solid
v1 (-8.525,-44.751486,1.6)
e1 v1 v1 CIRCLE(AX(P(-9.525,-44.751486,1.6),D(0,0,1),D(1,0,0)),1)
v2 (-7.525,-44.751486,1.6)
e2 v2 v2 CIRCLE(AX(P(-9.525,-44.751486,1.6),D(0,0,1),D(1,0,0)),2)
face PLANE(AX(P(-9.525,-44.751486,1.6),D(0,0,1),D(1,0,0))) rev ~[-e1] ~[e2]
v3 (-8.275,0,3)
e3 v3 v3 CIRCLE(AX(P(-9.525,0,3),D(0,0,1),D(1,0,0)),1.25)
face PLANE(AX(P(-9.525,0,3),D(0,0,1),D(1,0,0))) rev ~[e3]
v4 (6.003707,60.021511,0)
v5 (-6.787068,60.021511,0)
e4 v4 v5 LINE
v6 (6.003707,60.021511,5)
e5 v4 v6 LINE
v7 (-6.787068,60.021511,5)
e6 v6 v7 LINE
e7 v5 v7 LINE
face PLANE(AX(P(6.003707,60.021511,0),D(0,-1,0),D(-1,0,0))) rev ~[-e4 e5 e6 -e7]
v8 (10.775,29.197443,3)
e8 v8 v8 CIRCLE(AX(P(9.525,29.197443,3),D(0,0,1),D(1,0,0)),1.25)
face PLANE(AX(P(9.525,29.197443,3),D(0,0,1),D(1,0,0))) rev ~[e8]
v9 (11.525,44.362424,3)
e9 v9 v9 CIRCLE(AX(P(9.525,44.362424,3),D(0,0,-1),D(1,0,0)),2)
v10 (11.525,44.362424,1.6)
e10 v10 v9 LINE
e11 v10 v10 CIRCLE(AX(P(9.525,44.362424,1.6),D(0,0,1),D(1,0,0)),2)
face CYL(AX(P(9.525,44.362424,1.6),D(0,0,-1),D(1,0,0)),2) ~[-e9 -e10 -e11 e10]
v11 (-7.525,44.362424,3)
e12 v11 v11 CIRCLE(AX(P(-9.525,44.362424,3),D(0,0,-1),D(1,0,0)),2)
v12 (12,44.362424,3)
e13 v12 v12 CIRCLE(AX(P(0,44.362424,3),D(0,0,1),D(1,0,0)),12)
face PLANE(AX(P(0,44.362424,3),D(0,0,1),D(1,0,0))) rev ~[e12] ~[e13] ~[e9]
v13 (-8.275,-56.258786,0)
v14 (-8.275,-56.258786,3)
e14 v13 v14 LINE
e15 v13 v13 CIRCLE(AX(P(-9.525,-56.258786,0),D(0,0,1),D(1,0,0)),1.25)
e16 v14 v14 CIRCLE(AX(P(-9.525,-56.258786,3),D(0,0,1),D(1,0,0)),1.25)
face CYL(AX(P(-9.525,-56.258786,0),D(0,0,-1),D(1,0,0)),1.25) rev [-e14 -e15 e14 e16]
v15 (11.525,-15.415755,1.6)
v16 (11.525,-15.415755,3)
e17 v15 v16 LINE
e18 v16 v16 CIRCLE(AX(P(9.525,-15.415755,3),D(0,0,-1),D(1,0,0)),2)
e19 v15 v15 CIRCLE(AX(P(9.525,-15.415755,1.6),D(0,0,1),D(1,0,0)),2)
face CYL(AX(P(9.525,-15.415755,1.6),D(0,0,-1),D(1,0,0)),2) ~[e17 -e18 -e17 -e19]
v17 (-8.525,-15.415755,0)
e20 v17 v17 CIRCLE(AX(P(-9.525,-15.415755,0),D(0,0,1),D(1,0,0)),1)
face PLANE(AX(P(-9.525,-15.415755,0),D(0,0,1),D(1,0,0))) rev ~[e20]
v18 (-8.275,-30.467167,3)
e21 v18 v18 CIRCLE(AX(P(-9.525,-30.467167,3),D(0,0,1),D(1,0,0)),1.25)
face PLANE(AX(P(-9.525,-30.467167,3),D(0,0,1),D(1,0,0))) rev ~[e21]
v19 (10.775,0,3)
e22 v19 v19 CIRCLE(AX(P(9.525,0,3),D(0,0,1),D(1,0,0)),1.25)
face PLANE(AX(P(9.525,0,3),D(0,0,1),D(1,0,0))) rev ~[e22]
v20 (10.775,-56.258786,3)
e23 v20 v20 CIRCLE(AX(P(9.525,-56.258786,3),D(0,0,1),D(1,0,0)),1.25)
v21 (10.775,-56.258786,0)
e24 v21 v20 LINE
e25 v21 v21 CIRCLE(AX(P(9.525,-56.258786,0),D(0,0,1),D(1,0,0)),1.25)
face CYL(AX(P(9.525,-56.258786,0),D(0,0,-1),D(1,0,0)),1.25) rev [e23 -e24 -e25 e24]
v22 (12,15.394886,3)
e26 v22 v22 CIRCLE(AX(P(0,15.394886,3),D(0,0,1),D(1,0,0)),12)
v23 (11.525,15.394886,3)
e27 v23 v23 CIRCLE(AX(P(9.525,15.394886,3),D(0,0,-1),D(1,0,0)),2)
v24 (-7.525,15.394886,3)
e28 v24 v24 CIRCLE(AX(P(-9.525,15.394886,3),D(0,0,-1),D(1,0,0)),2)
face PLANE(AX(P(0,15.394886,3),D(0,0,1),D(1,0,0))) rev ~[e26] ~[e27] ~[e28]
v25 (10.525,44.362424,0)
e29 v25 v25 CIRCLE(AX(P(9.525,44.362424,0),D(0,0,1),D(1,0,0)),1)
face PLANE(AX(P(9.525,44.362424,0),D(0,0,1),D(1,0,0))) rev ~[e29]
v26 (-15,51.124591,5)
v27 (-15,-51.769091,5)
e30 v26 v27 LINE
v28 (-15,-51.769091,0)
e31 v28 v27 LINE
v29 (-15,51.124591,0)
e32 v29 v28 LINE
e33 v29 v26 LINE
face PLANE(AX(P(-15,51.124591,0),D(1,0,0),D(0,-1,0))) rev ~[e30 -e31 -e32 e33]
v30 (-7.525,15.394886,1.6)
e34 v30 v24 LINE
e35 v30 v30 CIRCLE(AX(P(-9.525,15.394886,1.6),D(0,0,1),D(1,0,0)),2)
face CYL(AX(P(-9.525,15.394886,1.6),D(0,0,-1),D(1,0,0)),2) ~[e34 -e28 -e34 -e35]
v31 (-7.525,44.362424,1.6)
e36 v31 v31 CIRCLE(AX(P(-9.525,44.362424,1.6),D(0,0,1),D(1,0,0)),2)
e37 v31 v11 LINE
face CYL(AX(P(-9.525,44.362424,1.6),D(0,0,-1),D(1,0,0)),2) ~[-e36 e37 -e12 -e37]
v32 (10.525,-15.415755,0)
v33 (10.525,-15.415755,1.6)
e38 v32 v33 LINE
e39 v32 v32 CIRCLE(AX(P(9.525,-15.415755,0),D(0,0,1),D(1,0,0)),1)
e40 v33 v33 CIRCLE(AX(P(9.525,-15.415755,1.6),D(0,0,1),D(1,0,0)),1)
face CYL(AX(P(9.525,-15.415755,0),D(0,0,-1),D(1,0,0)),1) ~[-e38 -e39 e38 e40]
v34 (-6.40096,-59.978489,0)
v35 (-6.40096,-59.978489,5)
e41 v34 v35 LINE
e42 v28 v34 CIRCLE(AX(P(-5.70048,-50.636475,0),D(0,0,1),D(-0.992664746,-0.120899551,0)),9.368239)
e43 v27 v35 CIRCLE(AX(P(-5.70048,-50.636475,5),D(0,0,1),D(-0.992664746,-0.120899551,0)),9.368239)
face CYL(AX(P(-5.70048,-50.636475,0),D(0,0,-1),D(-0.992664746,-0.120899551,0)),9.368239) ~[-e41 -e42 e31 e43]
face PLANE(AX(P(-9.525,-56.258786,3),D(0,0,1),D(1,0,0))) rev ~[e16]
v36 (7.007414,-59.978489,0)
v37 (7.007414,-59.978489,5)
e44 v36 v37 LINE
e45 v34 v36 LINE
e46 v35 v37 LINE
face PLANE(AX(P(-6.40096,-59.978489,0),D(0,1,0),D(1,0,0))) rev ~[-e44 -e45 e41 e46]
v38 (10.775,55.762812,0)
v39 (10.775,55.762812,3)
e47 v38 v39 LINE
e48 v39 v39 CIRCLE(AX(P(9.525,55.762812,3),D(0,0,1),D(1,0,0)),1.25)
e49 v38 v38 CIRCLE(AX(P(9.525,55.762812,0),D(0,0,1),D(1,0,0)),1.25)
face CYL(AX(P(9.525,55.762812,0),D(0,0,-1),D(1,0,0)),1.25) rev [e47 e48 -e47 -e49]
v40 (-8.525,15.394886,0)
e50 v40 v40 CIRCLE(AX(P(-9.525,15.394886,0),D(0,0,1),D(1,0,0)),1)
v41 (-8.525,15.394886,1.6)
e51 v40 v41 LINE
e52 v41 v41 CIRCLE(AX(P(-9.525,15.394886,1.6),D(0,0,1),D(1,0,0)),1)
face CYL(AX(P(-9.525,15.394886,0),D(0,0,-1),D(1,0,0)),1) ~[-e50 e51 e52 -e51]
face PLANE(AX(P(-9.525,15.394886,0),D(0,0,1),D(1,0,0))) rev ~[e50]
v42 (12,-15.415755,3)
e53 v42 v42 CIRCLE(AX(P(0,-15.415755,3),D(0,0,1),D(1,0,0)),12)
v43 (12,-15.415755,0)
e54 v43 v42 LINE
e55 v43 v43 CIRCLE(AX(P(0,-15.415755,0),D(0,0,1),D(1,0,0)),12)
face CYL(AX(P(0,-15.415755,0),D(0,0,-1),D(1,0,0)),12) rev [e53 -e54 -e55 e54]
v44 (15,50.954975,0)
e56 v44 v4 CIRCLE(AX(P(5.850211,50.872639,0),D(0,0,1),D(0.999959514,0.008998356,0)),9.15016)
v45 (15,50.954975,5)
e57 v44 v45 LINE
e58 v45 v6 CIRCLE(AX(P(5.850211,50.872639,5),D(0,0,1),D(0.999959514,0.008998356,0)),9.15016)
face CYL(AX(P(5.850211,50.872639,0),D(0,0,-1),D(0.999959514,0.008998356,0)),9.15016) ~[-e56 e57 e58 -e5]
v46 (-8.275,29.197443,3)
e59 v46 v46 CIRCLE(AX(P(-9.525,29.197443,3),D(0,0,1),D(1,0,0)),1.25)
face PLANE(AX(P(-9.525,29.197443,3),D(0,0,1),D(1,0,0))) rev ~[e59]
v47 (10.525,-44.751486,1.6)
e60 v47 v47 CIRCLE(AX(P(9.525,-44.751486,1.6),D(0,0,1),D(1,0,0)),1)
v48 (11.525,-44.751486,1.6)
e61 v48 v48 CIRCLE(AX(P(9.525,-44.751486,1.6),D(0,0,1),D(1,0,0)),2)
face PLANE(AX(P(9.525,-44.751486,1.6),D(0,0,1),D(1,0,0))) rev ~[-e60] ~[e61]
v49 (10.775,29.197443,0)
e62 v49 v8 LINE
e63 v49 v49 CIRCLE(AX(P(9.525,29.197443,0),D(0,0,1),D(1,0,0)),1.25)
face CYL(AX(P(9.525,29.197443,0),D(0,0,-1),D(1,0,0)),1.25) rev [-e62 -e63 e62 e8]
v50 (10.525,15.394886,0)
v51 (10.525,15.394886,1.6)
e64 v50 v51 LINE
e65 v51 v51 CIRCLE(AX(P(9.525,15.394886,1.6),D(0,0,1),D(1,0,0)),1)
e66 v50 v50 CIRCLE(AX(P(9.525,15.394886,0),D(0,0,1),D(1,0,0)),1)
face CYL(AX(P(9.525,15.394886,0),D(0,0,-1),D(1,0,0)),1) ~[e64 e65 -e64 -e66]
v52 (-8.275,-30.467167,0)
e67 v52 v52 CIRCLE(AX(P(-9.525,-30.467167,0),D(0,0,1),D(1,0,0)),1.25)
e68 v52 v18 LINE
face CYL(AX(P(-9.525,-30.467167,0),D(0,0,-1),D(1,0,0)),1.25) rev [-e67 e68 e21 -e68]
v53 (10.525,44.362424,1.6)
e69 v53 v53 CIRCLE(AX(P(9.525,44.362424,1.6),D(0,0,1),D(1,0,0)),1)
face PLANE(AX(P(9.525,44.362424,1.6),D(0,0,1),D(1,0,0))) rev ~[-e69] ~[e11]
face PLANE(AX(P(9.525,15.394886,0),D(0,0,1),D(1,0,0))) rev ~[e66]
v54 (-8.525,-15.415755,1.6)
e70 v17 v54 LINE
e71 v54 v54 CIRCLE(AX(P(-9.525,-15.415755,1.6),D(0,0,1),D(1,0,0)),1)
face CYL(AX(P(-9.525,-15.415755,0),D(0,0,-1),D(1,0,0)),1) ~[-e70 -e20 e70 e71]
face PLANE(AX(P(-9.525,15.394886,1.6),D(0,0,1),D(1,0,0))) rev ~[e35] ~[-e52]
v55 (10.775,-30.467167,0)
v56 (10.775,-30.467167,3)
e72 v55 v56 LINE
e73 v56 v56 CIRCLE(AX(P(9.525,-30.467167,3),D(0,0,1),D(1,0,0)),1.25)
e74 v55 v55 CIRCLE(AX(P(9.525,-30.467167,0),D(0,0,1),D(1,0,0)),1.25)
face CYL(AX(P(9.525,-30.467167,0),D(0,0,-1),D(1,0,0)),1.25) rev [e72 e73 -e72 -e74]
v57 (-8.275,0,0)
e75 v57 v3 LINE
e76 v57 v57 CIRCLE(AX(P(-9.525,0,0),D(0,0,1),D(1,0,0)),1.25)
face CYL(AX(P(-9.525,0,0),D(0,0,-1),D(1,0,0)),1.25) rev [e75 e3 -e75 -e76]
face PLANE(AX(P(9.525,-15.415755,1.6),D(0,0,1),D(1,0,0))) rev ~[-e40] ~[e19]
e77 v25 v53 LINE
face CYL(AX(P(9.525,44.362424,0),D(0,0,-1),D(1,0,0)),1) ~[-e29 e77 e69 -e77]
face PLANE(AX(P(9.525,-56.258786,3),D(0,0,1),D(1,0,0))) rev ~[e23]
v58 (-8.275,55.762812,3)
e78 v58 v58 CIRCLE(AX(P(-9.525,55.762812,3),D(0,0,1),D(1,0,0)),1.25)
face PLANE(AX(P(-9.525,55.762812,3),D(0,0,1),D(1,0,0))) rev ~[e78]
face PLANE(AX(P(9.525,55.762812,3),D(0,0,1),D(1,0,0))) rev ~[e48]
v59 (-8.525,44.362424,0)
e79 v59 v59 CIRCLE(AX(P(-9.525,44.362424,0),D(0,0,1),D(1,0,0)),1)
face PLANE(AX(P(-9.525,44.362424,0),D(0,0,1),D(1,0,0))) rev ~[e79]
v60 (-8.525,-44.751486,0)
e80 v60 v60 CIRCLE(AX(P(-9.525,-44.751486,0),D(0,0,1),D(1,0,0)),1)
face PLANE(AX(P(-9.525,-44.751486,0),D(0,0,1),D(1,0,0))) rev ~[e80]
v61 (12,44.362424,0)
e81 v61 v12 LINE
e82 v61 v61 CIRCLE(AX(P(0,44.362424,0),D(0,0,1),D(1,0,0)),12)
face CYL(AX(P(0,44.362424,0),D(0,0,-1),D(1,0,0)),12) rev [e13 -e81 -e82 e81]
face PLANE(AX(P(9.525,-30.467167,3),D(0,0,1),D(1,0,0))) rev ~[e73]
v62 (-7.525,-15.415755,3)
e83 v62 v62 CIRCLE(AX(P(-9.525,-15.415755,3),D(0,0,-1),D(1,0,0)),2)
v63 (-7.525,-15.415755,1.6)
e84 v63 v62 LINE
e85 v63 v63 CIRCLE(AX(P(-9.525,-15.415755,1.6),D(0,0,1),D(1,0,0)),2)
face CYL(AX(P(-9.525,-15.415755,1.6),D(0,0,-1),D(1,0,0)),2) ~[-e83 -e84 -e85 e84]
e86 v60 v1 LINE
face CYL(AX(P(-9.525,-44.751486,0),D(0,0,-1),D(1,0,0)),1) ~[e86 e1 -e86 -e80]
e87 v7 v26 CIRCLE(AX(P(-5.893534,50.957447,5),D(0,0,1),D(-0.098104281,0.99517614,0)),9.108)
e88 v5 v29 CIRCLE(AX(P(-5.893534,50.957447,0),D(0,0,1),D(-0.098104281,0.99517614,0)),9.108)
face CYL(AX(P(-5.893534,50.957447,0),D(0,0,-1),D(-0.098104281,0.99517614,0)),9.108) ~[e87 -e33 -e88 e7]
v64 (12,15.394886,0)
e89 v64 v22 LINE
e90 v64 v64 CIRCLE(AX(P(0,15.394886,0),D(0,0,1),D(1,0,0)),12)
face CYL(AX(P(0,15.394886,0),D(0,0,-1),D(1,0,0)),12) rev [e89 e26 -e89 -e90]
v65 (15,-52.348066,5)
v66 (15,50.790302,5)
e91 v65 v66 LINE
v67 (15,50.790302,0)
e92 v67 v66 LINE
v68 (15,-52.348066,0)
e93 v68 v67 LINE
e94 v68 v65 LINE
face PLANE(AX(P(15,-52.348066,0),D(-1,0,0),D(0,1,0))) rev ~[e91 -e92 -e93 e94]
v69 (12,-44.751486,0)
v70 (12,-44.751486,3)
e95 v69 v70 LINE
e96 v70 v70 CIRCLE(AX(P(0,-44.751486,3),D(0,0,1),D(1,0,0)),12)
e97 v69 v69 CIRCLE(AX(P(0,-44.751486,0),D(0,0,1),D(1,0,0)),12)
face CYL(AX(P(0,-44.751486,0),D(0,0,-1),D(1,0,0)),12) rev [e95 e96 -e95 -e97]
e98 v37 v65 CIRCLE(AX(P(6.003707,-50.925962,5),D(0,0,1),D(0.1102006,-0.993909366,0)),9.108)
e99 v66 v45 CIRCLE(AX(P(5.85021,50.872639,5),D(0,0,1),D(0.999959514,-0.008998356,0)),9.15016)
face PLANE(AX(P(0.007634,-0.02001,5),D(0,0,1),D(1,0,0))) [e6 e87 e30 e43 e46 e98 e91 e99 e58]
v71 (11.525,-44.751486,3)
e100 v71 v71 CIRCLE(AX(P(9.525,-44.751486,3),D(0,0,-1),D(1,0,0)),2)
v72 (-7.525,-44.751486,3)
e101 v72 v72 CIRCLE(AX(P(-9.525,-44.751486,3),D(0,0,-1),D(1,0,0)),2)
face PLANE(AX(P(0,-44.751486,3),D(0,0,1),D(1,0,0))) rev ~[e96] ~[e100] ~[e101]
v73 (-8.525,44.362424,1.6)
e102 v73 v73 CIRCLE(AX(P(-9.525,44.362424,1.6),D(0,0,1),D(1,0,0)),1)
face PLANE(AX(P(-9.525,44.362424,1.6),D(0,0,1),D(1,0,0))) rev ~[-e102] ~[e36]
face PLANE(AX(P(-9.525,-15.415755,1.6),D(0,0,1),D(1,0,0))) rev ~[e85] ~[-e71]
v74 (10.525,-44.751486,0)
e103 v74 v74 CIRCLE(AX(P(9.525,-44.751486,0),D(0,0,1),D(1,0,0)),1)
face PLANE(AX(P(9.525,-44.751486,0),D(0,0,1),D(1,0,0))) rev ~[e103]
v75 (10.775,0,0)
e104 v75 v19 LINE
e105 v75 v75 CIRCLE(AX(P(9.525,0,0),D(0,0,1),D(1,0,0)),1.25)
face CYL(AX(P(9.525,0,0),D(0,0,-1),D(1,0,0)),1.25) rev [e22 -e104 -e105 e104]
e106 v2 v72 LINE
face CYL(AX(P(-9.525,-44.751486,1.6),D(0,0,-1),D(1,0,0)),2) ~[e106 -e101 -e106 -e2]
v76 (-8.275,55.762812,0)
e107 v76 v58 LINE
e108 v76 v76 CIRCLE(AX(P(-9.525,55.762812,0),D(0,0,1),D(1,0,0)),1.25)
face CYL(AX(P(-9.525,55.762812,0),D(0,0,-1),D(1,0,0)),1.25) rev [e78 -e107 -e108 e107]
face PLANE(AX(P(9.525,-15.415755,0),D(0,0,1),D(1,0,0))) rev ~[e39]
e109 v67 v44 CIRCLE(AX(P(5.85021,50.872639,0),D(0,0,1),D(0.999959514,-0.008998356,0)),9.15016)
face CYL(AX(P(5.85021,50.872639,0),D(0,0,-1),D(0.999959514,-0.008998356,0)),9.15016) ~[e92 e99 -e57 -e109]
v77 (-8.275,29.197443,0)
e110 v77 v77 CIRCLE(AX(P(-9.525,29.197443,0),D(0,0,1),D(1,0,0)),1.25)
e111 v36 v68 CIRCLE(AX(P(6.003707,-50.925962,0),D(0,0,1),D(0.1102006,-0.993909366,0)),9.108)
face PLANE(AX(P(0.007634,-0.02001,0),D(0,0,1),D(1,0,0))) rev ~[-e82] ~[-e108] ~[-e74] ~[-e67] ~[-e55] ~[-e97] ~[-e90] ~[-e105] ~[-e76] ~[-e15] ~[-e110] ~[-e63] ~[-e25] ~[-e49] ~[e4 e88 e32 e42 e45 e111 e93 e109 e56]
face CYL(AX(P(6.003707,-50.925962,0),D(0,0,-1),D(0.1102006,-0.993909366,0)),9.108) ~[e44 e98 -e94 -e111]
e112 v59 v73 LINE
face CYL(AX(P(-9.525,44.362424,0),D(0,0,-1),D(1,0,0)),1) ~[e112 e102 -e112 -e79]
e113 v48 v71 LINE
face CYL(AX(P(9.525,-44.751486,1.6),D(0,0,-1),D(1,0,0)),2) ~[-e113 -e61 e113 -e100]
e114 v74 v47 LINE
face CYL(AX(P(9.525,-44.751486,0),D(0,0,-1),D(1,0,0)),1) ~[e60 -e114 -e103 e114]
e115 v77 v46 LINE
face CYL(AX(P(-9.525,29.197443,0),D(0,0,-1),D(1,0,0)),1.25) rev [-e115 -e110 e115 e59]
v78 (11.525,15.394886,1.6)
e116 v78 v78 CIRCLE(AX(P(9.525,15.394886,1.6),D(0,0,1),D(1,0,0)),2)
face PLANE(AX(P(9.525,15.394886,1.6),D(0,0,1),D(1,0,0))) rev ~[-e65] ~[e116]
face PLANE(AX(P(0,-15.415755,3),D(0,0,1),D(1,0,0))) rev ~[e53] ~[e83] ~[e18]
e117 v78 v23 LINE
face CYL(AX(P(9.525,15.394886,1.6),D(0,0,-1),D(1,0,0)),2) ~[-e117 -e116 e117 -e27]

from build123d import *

# Parameters (mm, degrees)
F0_R          = 1.25
F0_R_2        = 12
F1_DEPTH      = 5
F0_R_3        = 1
F2_START      = 3
F0_R_4        = 2
F2_DEPTH      = 2
F4_START      = 1.6
F4_DEPTH      = 3.4
F5_DEPTH      = 1.3
F5_DEPTH_BACK = 0.1


# Not quite as in the source:
# - a feature of the source that left no trace in its solid (it failed there, or was rolled back) is left out


with BuildPart() as f1:
    # F0 (on Top) → F1 (new body)
    with BuildSketch(Plane.XY):
        with BuildLine():
            Line((6.0037070689, 60.0215111673), (-5, 60.0215111673))
            Line((-5, 60.0215111673), (-6.7870675903, 60.0215111673))
            ThreePointArc((-6.7870675903, 60.0215111673), (-12.5859769766, 57.1353808627), (-15, 51.1245913098))
            Line((-15, 51.1245913098), (-15, 50.7903024554))
            Line((-15, 50.7903024554), (-15, -49.5038591325))
            Line((-15, -49.5038591325), (-15, -51.7690908138))
            ThreePointArc((-15, -51.7690908138), (-12.1695256151, -57.4125609321), (-6.4009595691, -59.9784888327))
            Line((-6.4009595691, -59.9784888327), (-5, -59.9784888327))
            Line((-5, -59.9784888327), (5, -59.9784888327))
            Line((5, -59.9784888327), (7.0074141379, -59.9784888327))
            ThreePointArc((7.0074141379, -59.9784888327), (12.2930504345, -57.5138166091), (15, -52.3480655233))
            Line((15, -52.3480655233), (15, -49.5038591325))
            Line((15, -49.5038591325), (15, 50.7903024554))
            Line((15, 50.7903024554), (15, 50.95497525))
            ThreePointArc((15, 50.95497525), (12.3454627339, 57.317569046), (6.0037070689, 60.0215111673))
        make_face()
        with Locations((-9.525, -56.2587864697)):
            Circle(F0_R, mode=Mode.SUBTRACT)
        with Locations((-9.525, -30.4671674967)):
            Circle(F0_R, mode=Mode.SUBTRACT)
        with Locations((0, -44.7514858243)):
            Circle(F0_R_2, mode=Mode.SUBTRACT)
        with Locations((-9.525, 0)):
            Circle(F0_R, mode=Mode.SUBTRACT)
        with Locations((0, -15.4157546586)):
            Circle(F0_R_2, mode=Mode.SUBTRACT)
        with Locations((9.525, -56.2587864697)):
            Circle(F0_R, mode=Mode.SUBTRACT)
        with Locations((9.525, -30.4671674967)):
            Circle(F0_R, mode=Mode.SUBTRACT)
        with Locations((9.525, 0)):
            Circle(F0_R, mode=Mode.SUBTRACT)
        with Locations((-9.525, 29.1974432766)):
            Circle(F0_R, mode=Mode.SUBTRACT)
        with Locations((0, 15.3948861798)):
            Circle(F0_R_2, mode=Mode.SUBTRACT)
        with Locations((-9.525, 55.7628124952)):
            Circle(F0_R, mode=Mode.SUBTRACT)
        with Locations((0, 44.3624239764)):
            Circle(F0_R_2, mode=Mode.SUBTRACT)
        with Locations((9.525, 29.1974432766)):
            Circle(F0_R, mode=Mode.SUBTRACT)
        with Locations((9.525, 55.7628124952)):
            Circle(F0_R, mode=Mode.SUBTRACT)
        with BuildLine():
            ThreePointArc((15, 50.7903024554), (15.0003704536, 50.8726388527), (15, 50.95497525))
            Line((15, 50.95497525), (15, 50.7903024554))
        make_face()
    extrude(amount=F1_DEPTH)



with BuildPart() as f1b:
    # F0 (on Top) → F1, piece 2 (new body)
    with BuildSketch(Plane.XY):
        with Locations((-9.525, 44.3624239764)):
            Circle(F0_R_3)
    extrude(amount=F1_DEPTH)


with BuildPart() as f1c:
    # F0 (on Top) → F1, piece 3 (new body)
    with BuildSketch(Plane.XY):
        with Locations((9.525, 44.3624239764)):
            Circle(F0_R_3)
    extrude(amount=F1_DEPTH)


with BuildPart() as f1d:
    # F0 (on Top) → F1, piece 4 (new body)
    with BuildSketch(Plane.XY):
        with Locations((9.525, 15.3948861798)):
            Circle(F0_R_3)
    extrude(amount=F1_DEPTH)


with BuildPart() as f1e:
    # F0 (on Top) → F1, piece 5 (new body)
    with BuildSketch(Plane.XY):
        with Locations((-9.525, 15.3948861798)):
            Circle(F0_R_3)
    extrude(amount=F1_DEPTH)


with BuildPart() as f1f:
    # F0 (on Top) → F1, piece 6 (new body)
    with BuildSketch(Plane.XY):
        with Locations((9.525, -15.4157546586)):
            Circle(F0_R_3)
    extrude(amount=F1_DEPTH)


with BuildPart() as f1g:
    # F0 (on Top) → F1, piece 7 (new body)
    with BuildSketch(Plane.XY):
        with Locations((-9.525, -15.4157546586)):
            Circle(F0_R_3)
    extrude(amount=F1_DEPTH)


with BuildPart() as f1h:
    # F0 (on Top) → F1, piece 8 (new body)
    with BuildSketch(Plane.XY):
        with Locations((9.525, -44.7514858243)):
            Circle(F0_R_3)
    extrude(amount=F1_DEPTH)


with BuildPart() as f1i:
    # F0 (on Top) → F1, piece 9 (new body)
    with BuildSketch(Plane.XY):
        with Locations((-9.525, -44.7514858243)):
            Circle(F0_R_3)
    extrude(amount=F1_DEPTH)


with BuildPart() as f1_1:
    add(f1.part)

    add(f1b.part)  # F2 merges F1b

    add(f1c.part)  # F2 merges F1c

    add(f1d.part)  # F2 merges F1d

    add(f1e.part)  # F2 merges F1e

    add(f1f.part)  # F2 merges F1f

    add(f1g.part)  # F2 merges F1g

    add(f1h.part)  # F2 merges F1h

    add(f1i.part)  # F2 merges F1i
    # F0 (on Top) → F2 (join)
    with BuildSketch(Plane.XY.offset(F2_START)):
        with Locations((0, 44.3624239764)):
            Circle(F0_R_2)
        with Locations((-9.525, 44.3624239764)):
            Circle(F0_R_4, mode=Mode.SUBTRACT)
        with Locations((9.525, 44.3624239764)):
            Circle(F0_R_4, mode=Mode.SUBTRACT)
        with Locations((0, 15.3948861798)):
            Circle(F0_R_2)
        with Locations((-9.525, 15.3948861798)):
            Circle(F0_R_4, mode=Mode.SUBTRACT)
        with Locations((9.525, 15.3948861798)):
            Circle(F0_R_4, mode=Mode.SUBTRACT)
        with Locations((0, -15.4157546586)):
            Circle(F0_R_2)
        with Locations((-9.525, -15.4157546586)):
            Circle(F0_R_4, mode=Mode.SUBTRACT)
        with Locations((9.525, -15.4157546586)):
            Circle(F0_R_4, mode=Mode.SUBTRACT)
        with Locations((0, -44.7514858243)):
            Circle(F0_R_2)
        with Locations((-9.525, -44.7514858243)):
            Circle(F0_R_4, mode=Mode.SUBTRACT)
        with Locations((9.525, -44.7514858243)):
            Circle(F0_R_4, mode=Mode.SUBTRACT)
        with Locations((9.525, 44.3624239764)):
            Circle(F0_R_4)
        with Locations((9.525, 44.3624239764)):
            Circle(F0_R_3, mode=Mode.SUBTRACT)
        with Locations((-9.525, 44.3624239764)):
            Circle(F0_R_4)
        with Locations((-9.525, 44.3624239764)):
            Circle(F0_R_3, mode=Mode.SUBTRACT)
        with Locations((9.525, 15.3948861798)):
            Circle(F0_R_4)
        with Locations((9.525, 15.3948861798)):
            Circle(F0_R_3, mode=Mode.SUBTRACT)
        with Locations((-9.525, 15.3948861798)):
            Circle(F0_R_4)
        with Locations((-9.525, 15.3948861798)):
            Circle(F0_R_3, mode=Mode.SUBTRACT)
        with Locations((9.525, -15.4157546586)):
            Circle(F0_R_4)
        with Locations((9.525, -15.4157546586)):
            Circle(F0_R_3, mode=Mode.SUBTRACT)
        with Locations((-9.525, -15.4157546586)):
            Circle(F0_R_4)
        with Locations((-9.525, -15.4157546586)):
            Circle(F0_R_3, mode=Mode.SUBTRACT)
        with Locations((9.525, -44.7514858243)):
            Circle(F0_R_4)
        with Locations((9.525, -44.7514858243)):
            Circle(F0_R_3, mode=Mode.SUBTRACT)
        with Locations((-9.525, -44.7514858243)):
            Circle(F0_R_4)
        with Locations((-9.525, -44.7514858243)):
            Circle(F0_R_3, mode=Mode.SUBTRACT)
        with Locations((9.525, -56.2587864697)):
            Circle(F0_R)
        with Locations((-9.525, -56.2587864697)):
            Circle(F0_R)
        with Locations((-9.525, -30.4671674967)):
            Circle(F0_R)
        with Locations((9.525, -30.4671674967)):
            Circle(F0_R)
        with Locations((9.525, 0)):
            Circle(F0_R)
        with Locations((-9.525, 0)):
            Circle(F0_R)
        with Locations((-9.525, 29.1974432766)):
            Circle(F0_R)
        with Locations((9.525, 29.1974432766)):
            Circle(F0_R)
        with Locations((-9.525, 55.7628124952)):
            Circle(F0_R)
        with Locations((9.525, 55.7628124952)):
            Circle(F0_R)
        with Locations((9.525, 44.3624239764)):
            Circle(F0_R_3)
        with Locations((-9.525, 44.3624239764)):
            Circle(F0_R_3)
        with Locations((9.525, 15.3948861798)):
            Circle(F0_R_3)
        with Locations((-9.525, 15.3948861798)):
            Circle(F0_R_3)
        with Locations((9.525, -15.4157546586)):
            Circle(F0_R_3)
        with Locations((-9.525, -15.4157546586)):
            Circle(F0_R_3)
        with Locations((9.525, -44.7514858243)):
            Circle(F0_R_3)
        with Locations((-9.525, -44.7514858243)):
            Circle(F0_R_3)
    extrude(amount=F2_DEPTH)

    # F0 (on Top) → F4 (join)
    with BuildSketch(Plane.XY.offset(F4_START)):
        with Locations((9.525, 44.3624239764)):
            Circle(F0_R_4)
        with Locations((9.525, 44.3624239764)):
            Circle(F0_R_3, mode=Mode.SUBTRACT)
        with Locations((-9.525, 44.3624239764)):
            Circle(F0_R_4)
        with Locations((-9.525, 44.3624239764)):
            Circle(F0_R_3, mode=Mode.SUBTRACT)
        with Locations((9.525, 15.3948861798)):
            Circle(F0_R_4)
        with Locations((9.525, 15.3948861798)):
            Circle(F0_R_3, mode=Mode.SUBTRACT)
        with Locations((-9.525, 15.3948861798)):
            Circle(F0_R_4)
        with Locations((-9.525, 15.3948861798)):
            Circle(F0_R_3, mode=Mode.SUBTRACT)
        with Locations((9.525, -15.4157546586)):
            Circle(F0_R_4)
        with Locations((9.525, -15.4157546586)):
            Circle(F0_R_3, mode=Mode.SUBTRACT)
        with Locations((-9.525, -15.4157546586)):
            Circle(F0_R_4)
        with Locations((-9.525, -15.4157546586)):
            Circle(F0_R_3, mode=Mode.SUBTRACT)
        with Locations((9.525, -44.7514858243)):
            Circle(F0_R_4)
        with Locations((9.525, -44.7514858243)):
            Circle(F0_R_3, mode=Mode.SUBTRACT)
        with Locations((-9.525, -44.7514858243)):
            Circle(F0_R_4)
        with Locations((-9.525, -44.7514858243)):
            Circle(F0_R_3, mode=Mode.SUBTRACT)
    extrude(amount=F4_DEPTH)

    # F0 (on Top) → F5 (cut, two sides)
    with BuildSketch(Plane.XY) as f5_sk:
        with Locations((9.525, -56.2587864697)):
            Circle(F0_R)
        with Locations((-9.525, -56.2587864697)):
            Circle(F0_R)
        with Locations((-9.525, -30.4671674967)):
            Circle(F0_R)
        with Locations((9.525, -30.4671674967)):
            Circle(F0_R)
        with Locations((9.525, 0)):
            Circle(F0_R)
        with Locations((-9.525, 0)):
            Circle(F0_R)
        with Locations((9.525, 29.1974432766)):
            Circle(F0_R)
        with Locations((-9.525, 29.1974432766)):
            Circle(F0_R)
        with Locations((9.525, 55.7628124952)):
            Circle(F0_R)
        with Locations((-9.525, 55.7628124952)):
            Circle(F0_R)
    extrude(amount=F5_DEPTH, mode=Mode.SUBTRACT)
    extrude(f5_sk.sketch, amount=-F5_DEPTH_BACK, mode=Mode.SUBTRACT)


solid = f1_1.part
